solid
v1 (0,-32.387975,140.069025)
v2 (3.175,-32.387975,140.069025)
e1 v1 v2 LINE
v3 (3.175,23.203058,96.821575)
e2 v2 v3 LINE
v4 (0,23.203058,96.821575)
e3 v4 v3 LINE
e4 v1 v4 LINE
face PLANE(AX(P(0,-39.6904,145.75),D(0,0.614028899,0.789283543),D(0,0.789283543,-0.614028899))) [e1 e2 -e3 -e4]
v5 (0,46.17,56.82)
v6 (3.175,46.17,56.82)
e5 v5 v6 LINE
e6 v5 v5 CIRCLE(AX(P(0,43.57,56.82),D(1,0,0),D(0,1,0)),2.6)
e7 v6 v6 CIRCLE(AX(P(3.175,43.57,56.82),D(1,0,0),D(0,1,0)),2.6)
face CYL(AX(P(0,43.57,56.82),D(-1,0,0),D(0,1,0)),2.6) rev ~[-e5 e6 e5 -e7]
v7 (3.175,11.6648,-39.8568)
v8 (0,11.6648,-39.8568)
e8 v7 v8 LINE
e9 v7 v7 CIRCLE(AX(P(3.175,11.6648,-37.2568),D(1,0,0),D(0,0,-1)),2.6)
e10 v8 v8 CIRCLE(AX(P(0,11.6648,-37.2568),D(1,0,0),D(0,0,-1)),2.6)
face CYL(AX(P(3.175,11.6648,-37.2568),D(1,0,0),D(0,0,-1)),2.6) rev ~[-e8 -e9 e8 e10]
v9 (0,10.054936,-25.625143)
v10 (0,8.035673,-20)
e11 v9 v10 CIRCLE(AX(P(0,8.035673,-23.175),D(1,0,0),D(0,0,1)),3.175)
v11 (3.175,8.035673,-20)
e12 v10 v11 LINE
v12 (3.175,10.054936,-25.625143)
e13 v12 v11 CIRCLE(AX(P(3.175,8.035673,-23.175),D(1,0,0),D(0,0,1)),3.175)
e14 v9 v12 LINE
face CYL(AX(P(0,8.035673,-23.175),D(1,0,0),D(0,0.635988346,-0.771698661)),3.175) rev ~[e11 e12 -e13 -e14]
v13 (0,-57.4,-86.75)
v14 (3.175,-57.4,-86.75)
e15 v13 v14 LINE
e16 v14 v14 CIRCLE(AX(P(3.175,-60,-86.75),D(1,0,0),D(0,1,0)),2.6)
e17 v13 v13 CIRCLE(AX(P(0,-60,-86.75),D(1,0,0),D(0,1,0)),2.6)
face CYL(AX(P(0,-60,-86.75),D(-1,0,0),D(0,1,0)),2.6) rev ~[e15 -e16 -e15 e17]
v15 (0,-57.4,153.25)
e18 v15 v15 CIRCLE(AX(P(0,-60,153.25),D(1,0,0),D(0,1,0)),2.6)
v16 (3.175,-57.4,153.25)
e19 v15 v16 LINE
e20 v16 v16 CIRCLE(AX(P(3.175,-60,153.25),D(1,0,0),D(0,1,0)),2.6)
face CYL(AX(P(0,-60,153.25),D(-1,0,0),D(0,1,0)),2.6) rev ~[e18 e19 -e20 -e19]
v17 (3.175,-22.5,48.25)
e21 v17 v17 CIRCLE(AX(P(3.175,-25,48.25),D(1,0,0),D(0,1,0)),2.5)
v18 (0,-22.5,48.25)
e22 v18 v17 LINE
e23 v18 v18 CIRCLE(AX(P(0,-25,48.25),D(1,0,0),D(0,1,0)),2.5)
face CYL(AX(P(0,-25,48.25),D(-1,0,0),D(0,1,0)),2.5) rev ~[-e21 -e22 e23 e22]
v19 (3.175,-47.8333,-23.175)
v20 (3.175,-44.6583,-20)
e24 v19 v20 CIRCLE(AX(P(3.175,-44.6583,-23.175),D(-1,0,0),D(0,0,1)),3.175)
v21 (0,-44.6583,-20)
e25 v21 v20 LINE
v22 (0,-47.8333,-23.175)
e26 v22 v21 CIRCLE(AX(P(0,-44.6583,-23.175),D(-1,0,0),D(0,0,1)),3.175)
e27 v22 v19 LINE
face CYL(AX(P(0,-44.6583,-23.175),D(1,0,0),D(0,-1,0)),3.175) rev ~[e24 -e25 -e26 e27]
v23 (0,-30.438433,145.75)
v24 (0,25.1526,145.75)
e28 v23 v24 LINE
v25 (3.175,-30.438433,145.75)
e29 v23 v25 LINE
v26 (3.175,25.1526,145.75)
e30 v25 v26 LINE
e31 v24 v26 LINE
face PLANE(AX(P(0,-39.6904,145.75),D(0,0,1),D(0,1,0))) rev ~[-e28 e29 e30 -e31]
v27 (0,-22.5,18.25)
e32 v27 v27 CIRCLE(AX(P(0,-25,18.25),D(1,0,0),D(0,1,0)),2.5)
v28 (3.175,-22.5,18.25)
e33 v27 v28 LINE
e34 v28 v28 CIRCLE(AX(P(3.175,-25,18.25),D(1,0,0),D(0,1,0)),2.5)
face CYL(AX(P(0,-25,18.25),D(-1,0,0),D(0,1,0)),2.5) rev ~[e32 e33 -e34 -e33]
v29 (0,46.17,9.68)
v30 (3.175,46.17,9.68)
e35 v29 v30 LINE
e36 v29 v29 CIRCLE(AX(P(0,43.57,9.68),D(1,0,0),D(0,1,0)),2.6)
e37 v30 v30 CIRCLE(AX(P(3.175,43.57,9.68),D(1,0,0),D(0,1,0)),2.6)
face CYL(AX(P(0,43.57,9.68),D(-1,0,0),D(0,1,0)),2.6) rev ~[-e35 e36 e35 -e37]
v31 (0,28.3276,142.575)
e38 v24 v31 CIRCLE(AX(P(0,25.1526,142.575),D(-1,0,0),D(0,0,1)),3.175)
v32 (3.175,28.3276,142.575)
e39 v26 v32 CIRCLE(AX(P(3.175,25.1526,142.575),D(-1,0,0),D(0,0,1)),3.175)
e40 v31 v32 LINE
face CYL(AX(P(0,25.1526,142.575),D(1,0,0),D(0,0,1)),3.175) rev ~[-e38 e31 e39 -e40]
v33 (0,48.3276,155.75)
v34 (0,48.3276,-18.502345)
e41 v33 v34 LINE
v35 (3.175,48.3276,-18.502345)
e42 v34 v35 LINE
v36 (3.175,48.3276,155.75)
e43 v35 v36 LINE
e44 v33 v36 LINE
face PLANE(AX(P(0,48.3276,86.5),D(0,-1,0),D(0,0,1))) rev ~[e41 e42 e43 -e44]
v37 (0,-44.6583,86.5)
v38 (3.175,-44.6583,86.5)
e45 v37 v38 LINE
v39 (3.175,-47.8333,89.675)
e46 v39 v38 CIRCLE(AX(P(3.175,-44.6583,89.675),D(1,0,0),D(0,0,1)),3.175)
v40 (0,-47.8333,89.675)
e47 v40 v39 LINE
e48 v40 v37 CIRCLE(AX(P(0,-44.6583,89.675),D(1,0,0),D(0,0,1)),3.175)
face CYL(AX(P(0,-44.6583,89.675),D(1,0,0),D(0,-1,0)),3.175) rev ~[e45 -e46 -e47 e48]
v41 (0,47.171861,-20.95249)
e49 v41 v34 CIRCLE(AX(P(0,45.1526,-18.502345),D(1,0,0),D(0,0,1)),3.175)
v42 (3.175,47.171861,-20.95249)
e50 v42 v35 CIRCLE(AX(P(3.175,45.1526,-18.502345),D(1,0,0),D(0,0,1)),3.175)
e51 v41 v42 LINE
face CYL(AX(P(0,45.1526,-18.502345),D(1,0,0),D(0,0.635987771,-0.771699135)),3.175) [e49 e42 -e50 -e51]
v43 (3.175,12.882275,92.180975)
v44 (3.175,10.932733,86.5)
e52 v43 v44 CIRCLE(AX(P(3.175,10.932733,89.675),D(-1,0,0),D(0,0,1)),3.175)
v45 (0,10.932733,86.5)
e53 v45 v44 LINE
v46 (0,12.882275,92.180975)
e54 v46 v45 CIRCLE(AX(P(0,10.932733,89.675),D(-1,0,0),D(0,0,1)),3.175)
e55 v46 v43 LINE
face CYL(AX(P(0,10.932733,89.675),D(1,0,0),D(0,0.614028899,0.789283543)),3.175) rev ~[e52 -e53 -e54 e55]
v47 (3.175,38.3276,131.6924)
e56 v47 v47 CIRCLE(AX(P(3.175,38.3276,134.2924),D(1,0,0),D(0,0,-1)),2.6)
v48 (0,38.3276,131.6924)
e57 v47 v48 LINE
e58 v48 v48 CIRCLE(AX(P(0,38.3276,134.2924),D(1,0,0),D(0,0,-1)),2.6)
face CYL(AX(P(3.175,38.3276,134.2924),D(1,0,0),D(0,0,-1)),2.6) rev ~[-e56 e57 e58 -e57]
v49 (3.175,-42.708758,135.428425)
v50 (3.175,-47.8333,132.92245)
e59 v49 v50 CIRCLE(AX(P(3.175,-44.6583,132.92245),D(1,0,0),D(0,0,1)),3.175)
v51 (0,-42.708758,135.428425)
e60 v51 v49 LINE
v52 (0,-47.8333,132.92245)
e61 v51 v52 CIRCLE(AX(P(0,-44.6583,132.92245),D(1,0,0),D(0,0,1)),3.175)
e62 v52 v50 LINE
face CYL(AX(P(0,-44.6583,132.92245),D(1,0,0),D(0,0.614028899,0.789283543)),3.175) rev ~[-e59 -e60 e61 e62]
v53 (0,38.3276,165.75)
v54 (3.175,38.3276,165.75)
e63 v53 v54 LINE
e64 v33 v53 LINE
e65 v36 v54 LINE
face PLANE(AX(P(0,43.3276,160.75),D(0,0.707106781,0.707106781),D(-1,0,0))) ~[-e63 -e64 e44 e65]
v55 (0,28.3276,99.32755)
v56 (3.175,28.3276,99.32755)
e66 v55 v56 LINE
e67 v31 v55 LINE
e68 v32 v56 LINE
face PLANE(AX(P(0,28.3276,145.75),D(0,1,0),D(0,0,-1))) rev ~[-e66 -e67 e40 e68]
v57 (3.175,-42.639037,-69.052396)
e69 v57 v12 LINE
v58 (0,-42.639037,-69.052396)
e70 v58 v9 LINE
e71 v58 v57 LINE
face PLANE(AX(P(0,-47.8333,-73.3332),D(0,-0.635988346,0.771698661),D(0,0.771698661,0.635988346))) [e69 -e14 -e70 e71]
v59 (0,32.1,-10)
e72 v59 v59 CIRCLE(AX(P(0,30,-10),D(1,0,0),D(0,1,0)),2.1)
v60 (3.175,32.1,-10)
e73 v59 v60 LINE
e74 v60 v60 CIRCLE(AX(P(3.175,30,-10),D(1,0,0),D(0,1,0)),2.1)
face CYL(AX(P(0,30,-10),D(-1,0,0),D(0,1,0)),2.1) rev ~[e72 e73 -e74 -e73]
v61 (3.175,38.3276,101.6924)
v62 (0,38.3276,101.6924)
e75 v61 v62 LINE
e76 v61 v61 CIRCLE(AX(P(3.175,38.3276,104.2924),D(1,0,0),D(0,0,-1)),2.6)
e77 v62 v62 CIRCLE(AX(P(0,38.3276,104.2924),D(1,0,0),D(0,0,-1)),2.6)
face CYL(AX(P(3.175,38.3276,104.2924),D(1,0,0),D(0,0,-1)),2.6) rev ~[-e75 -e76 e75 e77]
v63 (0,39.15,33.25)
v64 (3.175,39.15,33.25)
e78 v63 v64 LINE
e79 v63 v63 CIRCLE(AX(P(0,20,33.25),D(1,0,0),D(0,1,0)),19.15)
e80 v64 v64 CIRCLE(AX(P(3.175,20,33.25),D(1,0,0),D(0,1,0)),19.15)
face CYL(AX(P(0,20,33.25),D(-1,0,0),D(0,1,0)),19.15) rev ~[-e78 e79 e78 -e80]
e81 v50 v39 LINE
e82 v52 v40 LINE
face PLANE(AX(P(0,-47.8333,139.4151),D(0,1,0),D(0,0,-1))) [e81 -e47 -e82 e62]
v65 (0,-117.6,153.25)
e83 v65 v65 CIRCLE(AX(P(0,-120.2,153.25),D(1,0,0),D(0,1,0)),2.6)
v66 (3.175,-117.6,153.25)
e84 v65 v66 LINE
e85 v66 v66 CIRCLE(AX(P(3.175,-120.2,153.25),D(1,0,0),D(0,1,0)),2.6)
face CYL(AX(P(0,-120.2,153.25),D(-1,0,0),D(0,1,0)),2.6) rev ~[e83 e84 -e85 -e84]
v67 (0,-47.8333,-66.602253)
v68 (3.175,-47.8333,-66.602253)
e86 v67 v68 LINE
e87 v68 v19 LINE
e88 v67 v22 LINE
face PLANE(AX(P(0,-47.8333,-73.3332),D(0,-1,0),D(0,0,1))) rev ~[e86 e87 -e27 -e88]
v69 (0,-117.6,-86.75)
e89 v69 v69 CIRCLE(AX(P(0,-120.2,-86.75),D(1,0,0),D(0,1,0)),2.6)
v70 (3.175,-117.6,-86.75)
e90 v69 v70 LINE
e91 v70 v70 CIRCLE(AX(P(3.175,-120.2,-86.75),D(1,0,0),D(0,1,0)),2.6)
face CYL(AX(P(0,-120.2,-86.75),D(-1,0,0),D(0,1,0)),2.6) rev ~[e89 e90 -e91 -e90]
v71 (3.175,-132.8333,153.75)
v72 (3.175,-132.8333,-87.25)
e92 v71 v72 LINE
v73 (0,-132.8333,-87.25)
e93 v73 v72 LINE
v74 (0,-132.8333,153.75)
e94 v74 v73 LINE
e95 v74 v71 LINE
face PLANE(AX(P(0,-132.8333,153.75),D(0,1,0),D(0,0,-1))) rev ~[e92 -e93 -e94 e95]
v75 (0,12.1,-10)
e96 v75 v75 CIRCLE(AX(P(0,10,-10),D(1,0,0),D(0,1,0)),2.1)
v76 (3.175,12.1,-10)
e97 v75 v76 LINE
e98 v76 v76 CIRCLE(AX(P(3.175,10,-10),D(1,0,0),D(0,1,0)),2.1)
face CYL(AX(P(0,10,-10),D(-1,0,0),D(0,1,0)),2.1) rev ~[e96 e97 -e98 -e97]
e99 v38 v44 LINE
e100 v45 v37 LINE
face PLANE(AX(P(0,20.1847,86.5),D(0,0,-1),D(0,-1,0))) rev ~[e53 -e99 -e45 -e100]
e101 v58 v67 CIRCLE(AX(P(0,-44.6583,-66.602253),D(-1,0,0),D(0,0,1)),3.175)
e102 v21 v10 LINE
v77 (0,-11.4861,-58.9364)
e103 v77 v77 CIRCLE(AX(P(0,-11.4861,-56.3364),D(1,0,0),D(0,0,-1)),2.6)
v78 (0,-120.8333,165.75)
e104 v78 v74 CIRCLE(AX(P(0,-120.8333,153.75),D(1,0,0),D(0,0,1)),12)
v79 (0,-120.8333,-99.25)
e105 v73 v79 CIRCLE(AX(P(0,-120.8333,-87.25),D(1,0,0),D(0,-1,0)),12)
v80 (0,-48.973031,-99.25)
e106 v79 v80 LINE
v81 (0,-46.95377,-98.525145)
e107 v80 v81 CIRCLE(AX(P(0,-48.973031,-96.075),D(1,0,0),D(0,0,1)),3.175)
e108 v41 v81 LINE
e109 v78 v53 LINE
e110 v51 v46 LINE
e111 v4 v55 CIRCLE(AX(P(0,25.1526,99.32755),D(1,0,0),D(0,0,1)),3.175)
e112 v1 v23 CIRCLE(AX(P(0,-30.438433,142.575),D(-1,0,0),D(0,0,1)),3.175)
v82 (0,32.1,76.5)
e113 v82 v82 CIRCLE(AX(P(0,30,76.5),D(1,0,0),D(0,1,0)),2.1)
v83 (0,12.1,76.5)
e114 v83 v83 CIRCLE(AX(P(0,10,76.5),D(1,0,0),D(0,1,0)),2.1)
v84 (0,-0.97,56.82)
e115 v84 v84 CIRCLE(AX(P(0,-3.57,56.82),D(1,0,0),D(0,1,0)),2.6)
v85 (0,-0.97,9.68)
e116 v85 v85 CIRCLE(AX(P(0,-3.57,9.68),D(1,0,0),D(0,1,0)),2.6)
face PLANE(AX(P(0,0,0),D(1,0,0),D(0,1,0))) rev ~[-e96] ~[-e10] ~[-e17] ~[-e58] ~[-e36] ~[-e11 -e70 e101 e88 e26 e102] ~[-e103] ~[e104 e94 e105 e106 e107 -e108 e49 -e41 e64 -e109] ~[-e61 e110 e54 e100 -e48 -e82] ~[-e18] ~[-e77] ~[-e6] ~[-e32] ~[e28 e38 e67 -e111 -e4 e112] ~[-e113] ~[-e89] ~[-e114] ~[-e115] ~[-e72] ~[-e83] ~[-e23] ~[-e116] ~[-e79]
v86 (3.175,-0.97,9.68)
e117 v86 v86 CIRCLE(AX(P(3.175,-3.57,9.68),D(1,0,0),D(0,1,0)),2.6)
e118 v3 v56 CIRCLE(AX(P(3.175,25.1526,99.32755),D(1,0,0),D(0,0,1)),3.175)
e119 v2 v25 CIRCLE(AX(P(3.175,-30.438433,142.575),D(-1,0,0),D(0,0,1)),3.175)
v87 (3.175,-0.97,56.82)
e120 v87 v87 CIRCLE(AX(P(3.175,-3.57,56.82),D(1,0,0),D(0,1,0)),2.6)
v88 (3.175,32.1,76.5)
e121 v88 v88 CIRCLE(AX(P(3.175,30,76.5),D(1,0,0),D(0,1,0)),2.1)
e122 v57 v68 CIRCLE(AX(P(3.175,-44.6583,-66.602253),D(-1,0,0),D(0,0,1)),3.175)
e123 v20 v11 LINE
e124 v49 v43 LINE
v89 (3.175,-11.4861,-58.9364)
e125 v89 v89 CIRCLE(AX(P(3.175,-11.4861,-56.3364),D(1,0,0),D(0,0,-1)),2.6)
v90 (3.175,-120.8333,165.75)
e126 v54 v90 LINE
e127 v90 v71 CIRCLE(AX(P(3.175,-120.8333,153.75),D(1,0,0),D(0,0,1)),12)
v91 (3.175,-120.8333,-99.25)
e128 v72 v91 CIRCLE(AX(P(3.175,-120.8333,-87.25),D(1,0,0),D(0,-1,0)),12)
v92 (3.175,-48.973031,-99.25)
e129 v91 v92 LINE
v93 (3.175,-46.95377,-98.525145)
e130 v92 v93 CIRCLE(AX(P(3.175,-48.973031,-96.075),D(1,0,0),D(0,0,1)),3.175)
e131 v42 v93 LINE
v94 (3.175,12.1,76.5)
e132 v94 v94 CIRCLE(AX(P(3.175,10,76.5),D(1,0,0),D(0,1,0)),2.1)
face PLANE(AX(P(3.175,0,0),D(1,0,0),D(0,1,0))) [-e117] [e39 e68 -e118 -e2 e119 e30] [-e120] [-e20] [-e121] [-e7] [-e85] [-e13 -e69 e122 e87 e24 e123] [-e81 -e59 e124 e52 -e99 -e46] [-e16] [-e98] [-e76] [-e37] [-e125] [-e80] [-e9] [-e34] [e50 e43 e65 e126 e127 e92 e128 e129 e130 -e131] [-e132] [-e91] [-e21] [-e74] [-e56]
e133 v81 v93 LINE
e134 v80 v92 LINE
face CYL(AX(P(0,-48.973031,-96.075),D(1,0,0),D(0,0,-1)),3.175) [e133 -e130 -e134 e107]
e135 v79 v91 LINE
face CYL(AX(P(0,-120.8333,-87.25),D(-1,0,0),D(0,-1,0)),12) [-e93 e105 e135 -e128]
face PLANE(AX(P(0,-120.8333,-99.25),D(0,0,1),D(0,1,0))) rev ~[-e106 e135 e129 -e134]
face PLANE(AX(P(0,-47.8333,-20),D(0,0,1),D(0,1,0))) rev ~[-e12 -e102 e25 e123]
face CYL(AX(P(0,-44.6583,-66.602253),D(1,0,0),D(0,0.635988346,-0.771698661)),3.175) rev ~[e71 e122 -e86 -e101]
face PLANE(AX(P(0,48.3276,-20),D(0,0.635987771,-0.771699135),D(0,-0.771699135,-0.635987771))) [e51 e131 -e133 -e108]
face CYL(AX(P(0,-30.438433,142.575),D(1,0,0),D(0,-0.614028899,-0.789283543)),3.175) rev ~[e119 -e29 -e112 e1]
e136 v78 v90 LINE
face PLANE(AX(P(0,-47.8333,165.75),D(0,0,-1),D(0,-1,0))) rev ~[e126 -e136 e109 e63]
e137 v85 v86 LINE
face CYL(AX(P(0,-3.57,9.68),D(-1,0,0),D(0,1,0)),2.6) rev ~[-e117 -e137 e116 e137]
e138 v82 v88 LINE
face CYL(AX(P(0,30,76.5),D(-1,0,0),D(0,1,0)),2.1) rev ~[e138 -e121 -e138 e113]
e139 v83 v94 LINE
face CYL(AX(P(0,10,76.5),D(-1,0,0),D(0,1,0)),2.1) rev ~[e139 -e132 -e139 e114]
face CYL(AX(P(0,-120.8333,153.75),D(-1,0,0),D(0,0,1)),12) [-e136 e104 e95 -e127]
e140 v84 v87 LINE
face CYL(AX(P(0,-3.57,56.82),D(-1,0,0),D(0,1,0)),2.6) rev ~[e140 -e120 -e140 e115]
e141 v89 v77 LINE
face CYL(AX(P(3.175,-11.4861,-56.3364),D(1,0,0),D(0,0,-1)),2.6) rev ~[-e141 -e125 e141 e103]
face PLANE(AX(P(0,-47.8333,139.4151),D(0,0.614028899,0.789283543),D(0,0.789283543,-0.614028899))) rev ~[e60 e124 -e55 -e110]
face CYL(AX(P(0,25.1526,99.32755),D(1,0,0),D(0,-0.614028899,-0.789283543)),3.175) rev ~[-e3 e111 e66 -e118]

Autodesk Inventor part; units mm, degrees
ref_plane "YZ Plane" through (0, 0, 0) normal (1, 0, 0) x (0, 1, 0)
ref_plane "XZ Plane" through (0, 0, 0) normal (0, 1, 0) x (-1, 0, 0)
ref_plane "XY Plane" through (0, 0, 0) normal (0, 0, 1) x (1, 0, 0)
sketch "Sketch1" plane through (0, 0, 0) normal (1, 0, 0) x (0, 1, 0)
  line L0 (0, 0) -> (40, 0) construction
  line L1 (40, 0) -> (40, 66.5) construction
  line L2 (40, 66.5) -> (0, 66.5) construction
  line L3 (0, 66.5) -> (0, 0) construction
  line L4 (0, 66.5) -> (40, 66.5) construction
  line L5 (40, 66.5) -> (40, 86.5) construction
  line L6 (40, 86.5) -> (0, 86.5)
  line L7 (0, 86.5) -> (0, 66.5) construction
  line L8 (0, 0) -> (40, 0) construction
  line L9 (40, 0) -> (40, -20) construction
  line L10 (40, -20) -> (0, -20) construction
  line L11 (0, -20) -> (0, 0) construction
  line L12 (48.2, 61.45) -> (-8.2, 61.45) construction
  line L13 (-8.2, 61.45) -> (-8.2, 5.05) construction
  line L14 (-8.2, 5.05) -> (48.2, 5.05) construction
  line L15 (48.2, 5.05) -> (48.2, 61.45) construction
  line L16 (48.2, 33.25) -> (-8.2, 33.25) construction
  line L17 (40, 33.25) -> (0, 33.25) construction
  line L18 (43.57, 56.82) -> (-3.57, 56.82) construction
  line L19 (-3.57, 56.82) -> (-3.57, 9.68) construction
  line L20 (-3.57, 9.68) -> (43.57, 9.68) construction
  line L21 (43.57, 9.68) -> (43.57, 56.82) construction
  line L22 (43.57, 56.82) -> (48.2, 56.82) construction
  line L23 (43.57, 56.82) -> (43.57, 61.45) construction
  line L24 (-3.57, 9.68) -> (-8.2, 9.68) construction
  line L25 (-3.57, 9.68) -> (-3.57, 5.05) construction
  line L26 (40, -10) -> (0, -10) construction
  line L27 (40, 76.5) -> (0, 76.5) construction
  circle A0 centre (30, 76.5) radius 2.1
  circle A1 centre (10, 76.5) radius 2.1
  circle A2 centre (30, -10) radius 2.1
  circle A3 centre (10, -10) radius 2.1
  circle A4 centre (43.57, 56.82) radius 2.6
  circle A5 centre (43.57, 9.68) radius 2.6
  circle A6 centre (-3.57, 9.68) radius 2.6
  circle A7 centre (-3.57, 56.82) radius 2.6
  circle A8 centre (20, 33.25) radius 19.15
  circle A9 centre (-25, 18.25) radius 11.08 construction
  circle A10 centre (-25, 18.25) radius 13 construction
  circle A11 centre (-25, 18.25) radius 2.5
  line L28 (-60, 153.25) -> (-60, -86.75) construction
  circle A12 centre (-60, -86.75) radius 2.6
  circle A13 centre (-60, 153.25) radius 2.6
  line L29 (-120.2, 153.25) -> (-120.2, -86.75) construction
  circle A14 centre (-120.2, -86.75) radius 2.6
  circle A15 centre (-120.2, 153.25) radius 2.6
  circle A16 centre (-60, -86.75) radius 12 construction
  circle A17 centre (-120.2, -86.75) radius 12 construction
  circle A18 centre (-120.2, 153.25) radius 12 construction
  circle A19 centre (-60, 153.25) radius 12 construction
  line L30 (-110, 482.7599) -> (-70, 482.7599) construction
  line L31 (-70, -517.2401) -> (-110, -517.2401) construction
  circle A20 centre (-25, 48.25) radius 2.5
  circle A21 centre (-25, 48.25) radius 11.08 construction
  circle A22 centre (-25, 48.25) radius 13 construction
  circle A23 centre (20, 33.25) radius 11.08 construction
  circle A24 centre (20, 33.25) radius 13 construction
  line L32 (-23.1873, 29.1807) -> (18.1873, 22.3193) construction
  line L33 (18.1873, 44.1807) -> (-23.1873, 37.3193) construction
  line L34 (-120.8333, -99.25) -> (-47.8333, -99.25)
  line L35 (-47.8333, 165.75) -> (-120.8333, 165.75)
  line L36 (-132.8333, 153.75) -> (-132.8333, -87.25)
  line L37 (-60, 153.25) -> (-120.2, 153.25) construction
  line L38 (-120.2, -86.75) -> (-60, -86.75) construction
  line L39 (-60, 153.25) -> (-60, 165.75) construction
  line L40 (-120.2, -86.75) -> (-120.2, -99.25) construction
  line L41 (48.3276, -20) -> (48.3276, 86.5)
  line L42 (17.6122, 86.5) -> (40, 86.5) construction
  arc A25 (-120.8333, 165.75) -> (-132.8333, 153.75) centre (-120.8333, 153.75) ccw
  arc A26 (-132.8333, -87.25) -> (-120.8333, -99.25) centre (-120.8333, -87.25) ccw
  line L43 (48.3276, -20) -> (-47.8333, -99.25)
  line L44 (-47.8333, 165.75) -> (-47.8333, -99.25) construction
  line L45 (-120.2, -86.75) -> (-132.8333, -86.75) construction
  line L46 (-60, 153.25) -> (-47.8333, 153.25) construction
  line L47 (-36.08, 48.25) -> (-36.08, 286.613) construction
  line L48 (-47.8333, 145.75) -> (-47.8333, 86.5)
  line L49 (-47.8333, 86.5) -> (16.8804, 86.5)
  line L50 (-47.8333, -73.3332) -> (16.8804, -20)
  line L51 (-47.8333, -73.3332) -> (-47.8333, -20)
  line L52 (-47.8333, -20) -> (16.8804, -20)
  line L53 (48.3276, 86.5) -> (48.3276, 165.75)
  line L54 (48.3276, 165.75) -> (-47.8333, 165.75)
  line L55 (-47.8333, 145.75) -> (28.3276, 145.75)
  line L56 (28.3276, 145.75) -> (28.3276, 86.5)
  line L57 (-47.8333, 145.75) -> (28.3276, 86.5) construction
  line L58 (-39.6904, 145.75) -> (28.3276, 92.8349)
  line L59 (-47.8333, 139.4151) -> (20.1847, 86.5)
  point P0 (-132.8333, -99.25)
  point P1 (-132.8333, 165.75)
  point P2 (-47.8333, 139.8332)
  point P3 (0, 86.5)
  dimension "d25" = 22.16
  dimension "d0" = 40
  dimension "d1" = 66.5
  dimension "d2" = 40
  dimension "d3" = 20
  dimension "d4" = 40
  dimension "d5" = 20
  dimension "d6" = 56.4
  dimension "d7" = 56.4
  dimension "d8" = 0
  dimension "d9" = 8.2
  dimension "d10" = 47.14
  dimension "d11" = 47.14
  dimension "d12" = 4.2
  dimension "d13" = 20
  dimension "d14" = 10
  dimension "d15" = 10
  dimension "d16" = 20
  dimension "d17" = 4.2
  dimension "d18" = 4.2
  dimension "d19" = 4.2
  dimension "d20" = 5.2
  dimension "d21" = 5.2
  dimension "d22" = 5.2
  dimension "d23" = 5.2
  dimension "d24" = 38.3
  dimension "d26" = 26
  dimension "d27" = 5
  dimension "d28" = 240
  dimension "d30" = 60
  dimension "d31" = 5.2
  dimension "d32" = 5.2
  dimension "d33" = 5.2
  dimension "d34" = 5.2
  dimension "d35" = 60.2
  dimension "d36" = 24
  dimension "d37" = 24
  dimension "d38" = 24
  dimension "d39" = 24
  dimension "d40" = 40
  dimension "d41" = 1000
  dimension "d44" = 45
  dimension "d45" = 5
  dimension "d46" = 22.16
  dimension "d47" = 26
  dimension "d48" = 45
  dimension "d49" = 22.16
  dimension "d50" = 26
  dimension "d51" = 15
  dimension "d52" = 15
  dimension "d53" = 265
  dimension "d54" = 85
  dimension "d55" = 106.5
  dimension "d60" = 12
  dimension "d84" = 72.8333
  dimension "d87" = 28.3276
  dimension "d90" = 53.25
  dimension "d91" = 85
  dimension "d92" = 132.5
  dimension "d93" = 60.2
  dimension "d99" = 20
  dimension "d100" = 20
  dimension "d102" = 5
  dimension "d103" = 5
extrude "Extrusion1" add sketch "Sketch1" along normal blind 3.175 contours L6 L59 L48 L55 L58 L56 | A26 L36 A25 L35 L54 L53 L41 L43 L34
sketch "Sketch4" plane through (3.175, 0, 0) normal (1, 0, 0) x (0, 0, -1)
  line L0 (20, 16.8804) -> (73.3332, -47.8333) projected
  line L1 (20, 16.8804) -> (73.3332, -47.8333) projected
  line L2 (39.0796, -6.2705) -> (54.5136, 6.4492) construction
  line L3 (99.25, -47.8333) -> (20, 48.3276) projected
  circle A0 centre (37.2568, 11.6648) radius 2.6
  circle A1 centre (56.3364, -11.4861) radius 2.6
  line L4 (37.2568, 11.6648) -> (46.7966, 0.0893) construction
  line L5 (56.3364, -11.4861) -> (46.7966, 0.0893) construction
  line L6 (-145.75, 28.3276) -> (-92.8349, 28.3276) projected
  line L7 (-119.2924, 28.3276) -> (-119.2924, 48.3276) construction
  line L8 (20, 48.3276) -> (-165.75, 48.3276) construction
  circle A2 centre (-104.2924, 38.3276) radius 2.6
  circle A3 centre (-134.2924, 38.3276) radius 2.6
  line L9 (-104.2924, 38.3276) -> (-119.2924, 38.3276) construction
  line L10 (-134.2924, 38.3276) -> (-119.2924, 38.3276) construction
  point P0 (0, 0)
  dimension "d107" = 5.2
  dimension "d108" = 5.2
  dimension "d109" = 15
  dimension "d110" = 15
  dimension "d111" = 30
  dimension "d112" = 5.2
  dimension "d113" = 5.2
  dimension "d114" = 15
  dimension "d115" = 15
extrude "Extrusion4" cut sketch "Sketch4" against normal through all
fillet "Fillet2" radius 3.175 7 edges at (1.5875, -47.8333, 139.4151) (1.5875, -47.8333, 86.5) (1.5875, -47.8333, -20) (1.5875, -47.8333, -73.3332) (1.5875, 16.8804, -20) (1.5875, 48.3276, -20) (1.5875, -47.8333, -99.25)
fillet "Fillet3" radius 3.175 4 edges at (1.5875, 28.3276, 145.75) (1.5875, 28.3276, 92.8349) (1.5875, 20.1847, 86.5) (1.5875, -39.6904, 145.75)
chamfer "Chamfer1" distance 10 angle 45 1 edges at (1.5875, 48.3276, 165.75)
equation "\"d11\" = d10"
equation "\"d17\" = d12"
equation "\"d18\" = d12"
equation "\"d19\" = d12"
equation "\"d21\" = d20"
equation "\"d22\" = d20"
equation "\"d23\" = d20"
equation "\"d32\" = d31"
equation "\"d33\" = d31"
equation "\"d34\" = d31"
equation "\"d37\" = d36"
equation "\"d38\" = d36"
equation "\"d39\" = d36"
equation "\"d45\" = d27"
equation "\"d46\" = d25"
equation "\"d47\" = d26"
properties part number "X Axis V Wheel and Motor Frame Machined"
